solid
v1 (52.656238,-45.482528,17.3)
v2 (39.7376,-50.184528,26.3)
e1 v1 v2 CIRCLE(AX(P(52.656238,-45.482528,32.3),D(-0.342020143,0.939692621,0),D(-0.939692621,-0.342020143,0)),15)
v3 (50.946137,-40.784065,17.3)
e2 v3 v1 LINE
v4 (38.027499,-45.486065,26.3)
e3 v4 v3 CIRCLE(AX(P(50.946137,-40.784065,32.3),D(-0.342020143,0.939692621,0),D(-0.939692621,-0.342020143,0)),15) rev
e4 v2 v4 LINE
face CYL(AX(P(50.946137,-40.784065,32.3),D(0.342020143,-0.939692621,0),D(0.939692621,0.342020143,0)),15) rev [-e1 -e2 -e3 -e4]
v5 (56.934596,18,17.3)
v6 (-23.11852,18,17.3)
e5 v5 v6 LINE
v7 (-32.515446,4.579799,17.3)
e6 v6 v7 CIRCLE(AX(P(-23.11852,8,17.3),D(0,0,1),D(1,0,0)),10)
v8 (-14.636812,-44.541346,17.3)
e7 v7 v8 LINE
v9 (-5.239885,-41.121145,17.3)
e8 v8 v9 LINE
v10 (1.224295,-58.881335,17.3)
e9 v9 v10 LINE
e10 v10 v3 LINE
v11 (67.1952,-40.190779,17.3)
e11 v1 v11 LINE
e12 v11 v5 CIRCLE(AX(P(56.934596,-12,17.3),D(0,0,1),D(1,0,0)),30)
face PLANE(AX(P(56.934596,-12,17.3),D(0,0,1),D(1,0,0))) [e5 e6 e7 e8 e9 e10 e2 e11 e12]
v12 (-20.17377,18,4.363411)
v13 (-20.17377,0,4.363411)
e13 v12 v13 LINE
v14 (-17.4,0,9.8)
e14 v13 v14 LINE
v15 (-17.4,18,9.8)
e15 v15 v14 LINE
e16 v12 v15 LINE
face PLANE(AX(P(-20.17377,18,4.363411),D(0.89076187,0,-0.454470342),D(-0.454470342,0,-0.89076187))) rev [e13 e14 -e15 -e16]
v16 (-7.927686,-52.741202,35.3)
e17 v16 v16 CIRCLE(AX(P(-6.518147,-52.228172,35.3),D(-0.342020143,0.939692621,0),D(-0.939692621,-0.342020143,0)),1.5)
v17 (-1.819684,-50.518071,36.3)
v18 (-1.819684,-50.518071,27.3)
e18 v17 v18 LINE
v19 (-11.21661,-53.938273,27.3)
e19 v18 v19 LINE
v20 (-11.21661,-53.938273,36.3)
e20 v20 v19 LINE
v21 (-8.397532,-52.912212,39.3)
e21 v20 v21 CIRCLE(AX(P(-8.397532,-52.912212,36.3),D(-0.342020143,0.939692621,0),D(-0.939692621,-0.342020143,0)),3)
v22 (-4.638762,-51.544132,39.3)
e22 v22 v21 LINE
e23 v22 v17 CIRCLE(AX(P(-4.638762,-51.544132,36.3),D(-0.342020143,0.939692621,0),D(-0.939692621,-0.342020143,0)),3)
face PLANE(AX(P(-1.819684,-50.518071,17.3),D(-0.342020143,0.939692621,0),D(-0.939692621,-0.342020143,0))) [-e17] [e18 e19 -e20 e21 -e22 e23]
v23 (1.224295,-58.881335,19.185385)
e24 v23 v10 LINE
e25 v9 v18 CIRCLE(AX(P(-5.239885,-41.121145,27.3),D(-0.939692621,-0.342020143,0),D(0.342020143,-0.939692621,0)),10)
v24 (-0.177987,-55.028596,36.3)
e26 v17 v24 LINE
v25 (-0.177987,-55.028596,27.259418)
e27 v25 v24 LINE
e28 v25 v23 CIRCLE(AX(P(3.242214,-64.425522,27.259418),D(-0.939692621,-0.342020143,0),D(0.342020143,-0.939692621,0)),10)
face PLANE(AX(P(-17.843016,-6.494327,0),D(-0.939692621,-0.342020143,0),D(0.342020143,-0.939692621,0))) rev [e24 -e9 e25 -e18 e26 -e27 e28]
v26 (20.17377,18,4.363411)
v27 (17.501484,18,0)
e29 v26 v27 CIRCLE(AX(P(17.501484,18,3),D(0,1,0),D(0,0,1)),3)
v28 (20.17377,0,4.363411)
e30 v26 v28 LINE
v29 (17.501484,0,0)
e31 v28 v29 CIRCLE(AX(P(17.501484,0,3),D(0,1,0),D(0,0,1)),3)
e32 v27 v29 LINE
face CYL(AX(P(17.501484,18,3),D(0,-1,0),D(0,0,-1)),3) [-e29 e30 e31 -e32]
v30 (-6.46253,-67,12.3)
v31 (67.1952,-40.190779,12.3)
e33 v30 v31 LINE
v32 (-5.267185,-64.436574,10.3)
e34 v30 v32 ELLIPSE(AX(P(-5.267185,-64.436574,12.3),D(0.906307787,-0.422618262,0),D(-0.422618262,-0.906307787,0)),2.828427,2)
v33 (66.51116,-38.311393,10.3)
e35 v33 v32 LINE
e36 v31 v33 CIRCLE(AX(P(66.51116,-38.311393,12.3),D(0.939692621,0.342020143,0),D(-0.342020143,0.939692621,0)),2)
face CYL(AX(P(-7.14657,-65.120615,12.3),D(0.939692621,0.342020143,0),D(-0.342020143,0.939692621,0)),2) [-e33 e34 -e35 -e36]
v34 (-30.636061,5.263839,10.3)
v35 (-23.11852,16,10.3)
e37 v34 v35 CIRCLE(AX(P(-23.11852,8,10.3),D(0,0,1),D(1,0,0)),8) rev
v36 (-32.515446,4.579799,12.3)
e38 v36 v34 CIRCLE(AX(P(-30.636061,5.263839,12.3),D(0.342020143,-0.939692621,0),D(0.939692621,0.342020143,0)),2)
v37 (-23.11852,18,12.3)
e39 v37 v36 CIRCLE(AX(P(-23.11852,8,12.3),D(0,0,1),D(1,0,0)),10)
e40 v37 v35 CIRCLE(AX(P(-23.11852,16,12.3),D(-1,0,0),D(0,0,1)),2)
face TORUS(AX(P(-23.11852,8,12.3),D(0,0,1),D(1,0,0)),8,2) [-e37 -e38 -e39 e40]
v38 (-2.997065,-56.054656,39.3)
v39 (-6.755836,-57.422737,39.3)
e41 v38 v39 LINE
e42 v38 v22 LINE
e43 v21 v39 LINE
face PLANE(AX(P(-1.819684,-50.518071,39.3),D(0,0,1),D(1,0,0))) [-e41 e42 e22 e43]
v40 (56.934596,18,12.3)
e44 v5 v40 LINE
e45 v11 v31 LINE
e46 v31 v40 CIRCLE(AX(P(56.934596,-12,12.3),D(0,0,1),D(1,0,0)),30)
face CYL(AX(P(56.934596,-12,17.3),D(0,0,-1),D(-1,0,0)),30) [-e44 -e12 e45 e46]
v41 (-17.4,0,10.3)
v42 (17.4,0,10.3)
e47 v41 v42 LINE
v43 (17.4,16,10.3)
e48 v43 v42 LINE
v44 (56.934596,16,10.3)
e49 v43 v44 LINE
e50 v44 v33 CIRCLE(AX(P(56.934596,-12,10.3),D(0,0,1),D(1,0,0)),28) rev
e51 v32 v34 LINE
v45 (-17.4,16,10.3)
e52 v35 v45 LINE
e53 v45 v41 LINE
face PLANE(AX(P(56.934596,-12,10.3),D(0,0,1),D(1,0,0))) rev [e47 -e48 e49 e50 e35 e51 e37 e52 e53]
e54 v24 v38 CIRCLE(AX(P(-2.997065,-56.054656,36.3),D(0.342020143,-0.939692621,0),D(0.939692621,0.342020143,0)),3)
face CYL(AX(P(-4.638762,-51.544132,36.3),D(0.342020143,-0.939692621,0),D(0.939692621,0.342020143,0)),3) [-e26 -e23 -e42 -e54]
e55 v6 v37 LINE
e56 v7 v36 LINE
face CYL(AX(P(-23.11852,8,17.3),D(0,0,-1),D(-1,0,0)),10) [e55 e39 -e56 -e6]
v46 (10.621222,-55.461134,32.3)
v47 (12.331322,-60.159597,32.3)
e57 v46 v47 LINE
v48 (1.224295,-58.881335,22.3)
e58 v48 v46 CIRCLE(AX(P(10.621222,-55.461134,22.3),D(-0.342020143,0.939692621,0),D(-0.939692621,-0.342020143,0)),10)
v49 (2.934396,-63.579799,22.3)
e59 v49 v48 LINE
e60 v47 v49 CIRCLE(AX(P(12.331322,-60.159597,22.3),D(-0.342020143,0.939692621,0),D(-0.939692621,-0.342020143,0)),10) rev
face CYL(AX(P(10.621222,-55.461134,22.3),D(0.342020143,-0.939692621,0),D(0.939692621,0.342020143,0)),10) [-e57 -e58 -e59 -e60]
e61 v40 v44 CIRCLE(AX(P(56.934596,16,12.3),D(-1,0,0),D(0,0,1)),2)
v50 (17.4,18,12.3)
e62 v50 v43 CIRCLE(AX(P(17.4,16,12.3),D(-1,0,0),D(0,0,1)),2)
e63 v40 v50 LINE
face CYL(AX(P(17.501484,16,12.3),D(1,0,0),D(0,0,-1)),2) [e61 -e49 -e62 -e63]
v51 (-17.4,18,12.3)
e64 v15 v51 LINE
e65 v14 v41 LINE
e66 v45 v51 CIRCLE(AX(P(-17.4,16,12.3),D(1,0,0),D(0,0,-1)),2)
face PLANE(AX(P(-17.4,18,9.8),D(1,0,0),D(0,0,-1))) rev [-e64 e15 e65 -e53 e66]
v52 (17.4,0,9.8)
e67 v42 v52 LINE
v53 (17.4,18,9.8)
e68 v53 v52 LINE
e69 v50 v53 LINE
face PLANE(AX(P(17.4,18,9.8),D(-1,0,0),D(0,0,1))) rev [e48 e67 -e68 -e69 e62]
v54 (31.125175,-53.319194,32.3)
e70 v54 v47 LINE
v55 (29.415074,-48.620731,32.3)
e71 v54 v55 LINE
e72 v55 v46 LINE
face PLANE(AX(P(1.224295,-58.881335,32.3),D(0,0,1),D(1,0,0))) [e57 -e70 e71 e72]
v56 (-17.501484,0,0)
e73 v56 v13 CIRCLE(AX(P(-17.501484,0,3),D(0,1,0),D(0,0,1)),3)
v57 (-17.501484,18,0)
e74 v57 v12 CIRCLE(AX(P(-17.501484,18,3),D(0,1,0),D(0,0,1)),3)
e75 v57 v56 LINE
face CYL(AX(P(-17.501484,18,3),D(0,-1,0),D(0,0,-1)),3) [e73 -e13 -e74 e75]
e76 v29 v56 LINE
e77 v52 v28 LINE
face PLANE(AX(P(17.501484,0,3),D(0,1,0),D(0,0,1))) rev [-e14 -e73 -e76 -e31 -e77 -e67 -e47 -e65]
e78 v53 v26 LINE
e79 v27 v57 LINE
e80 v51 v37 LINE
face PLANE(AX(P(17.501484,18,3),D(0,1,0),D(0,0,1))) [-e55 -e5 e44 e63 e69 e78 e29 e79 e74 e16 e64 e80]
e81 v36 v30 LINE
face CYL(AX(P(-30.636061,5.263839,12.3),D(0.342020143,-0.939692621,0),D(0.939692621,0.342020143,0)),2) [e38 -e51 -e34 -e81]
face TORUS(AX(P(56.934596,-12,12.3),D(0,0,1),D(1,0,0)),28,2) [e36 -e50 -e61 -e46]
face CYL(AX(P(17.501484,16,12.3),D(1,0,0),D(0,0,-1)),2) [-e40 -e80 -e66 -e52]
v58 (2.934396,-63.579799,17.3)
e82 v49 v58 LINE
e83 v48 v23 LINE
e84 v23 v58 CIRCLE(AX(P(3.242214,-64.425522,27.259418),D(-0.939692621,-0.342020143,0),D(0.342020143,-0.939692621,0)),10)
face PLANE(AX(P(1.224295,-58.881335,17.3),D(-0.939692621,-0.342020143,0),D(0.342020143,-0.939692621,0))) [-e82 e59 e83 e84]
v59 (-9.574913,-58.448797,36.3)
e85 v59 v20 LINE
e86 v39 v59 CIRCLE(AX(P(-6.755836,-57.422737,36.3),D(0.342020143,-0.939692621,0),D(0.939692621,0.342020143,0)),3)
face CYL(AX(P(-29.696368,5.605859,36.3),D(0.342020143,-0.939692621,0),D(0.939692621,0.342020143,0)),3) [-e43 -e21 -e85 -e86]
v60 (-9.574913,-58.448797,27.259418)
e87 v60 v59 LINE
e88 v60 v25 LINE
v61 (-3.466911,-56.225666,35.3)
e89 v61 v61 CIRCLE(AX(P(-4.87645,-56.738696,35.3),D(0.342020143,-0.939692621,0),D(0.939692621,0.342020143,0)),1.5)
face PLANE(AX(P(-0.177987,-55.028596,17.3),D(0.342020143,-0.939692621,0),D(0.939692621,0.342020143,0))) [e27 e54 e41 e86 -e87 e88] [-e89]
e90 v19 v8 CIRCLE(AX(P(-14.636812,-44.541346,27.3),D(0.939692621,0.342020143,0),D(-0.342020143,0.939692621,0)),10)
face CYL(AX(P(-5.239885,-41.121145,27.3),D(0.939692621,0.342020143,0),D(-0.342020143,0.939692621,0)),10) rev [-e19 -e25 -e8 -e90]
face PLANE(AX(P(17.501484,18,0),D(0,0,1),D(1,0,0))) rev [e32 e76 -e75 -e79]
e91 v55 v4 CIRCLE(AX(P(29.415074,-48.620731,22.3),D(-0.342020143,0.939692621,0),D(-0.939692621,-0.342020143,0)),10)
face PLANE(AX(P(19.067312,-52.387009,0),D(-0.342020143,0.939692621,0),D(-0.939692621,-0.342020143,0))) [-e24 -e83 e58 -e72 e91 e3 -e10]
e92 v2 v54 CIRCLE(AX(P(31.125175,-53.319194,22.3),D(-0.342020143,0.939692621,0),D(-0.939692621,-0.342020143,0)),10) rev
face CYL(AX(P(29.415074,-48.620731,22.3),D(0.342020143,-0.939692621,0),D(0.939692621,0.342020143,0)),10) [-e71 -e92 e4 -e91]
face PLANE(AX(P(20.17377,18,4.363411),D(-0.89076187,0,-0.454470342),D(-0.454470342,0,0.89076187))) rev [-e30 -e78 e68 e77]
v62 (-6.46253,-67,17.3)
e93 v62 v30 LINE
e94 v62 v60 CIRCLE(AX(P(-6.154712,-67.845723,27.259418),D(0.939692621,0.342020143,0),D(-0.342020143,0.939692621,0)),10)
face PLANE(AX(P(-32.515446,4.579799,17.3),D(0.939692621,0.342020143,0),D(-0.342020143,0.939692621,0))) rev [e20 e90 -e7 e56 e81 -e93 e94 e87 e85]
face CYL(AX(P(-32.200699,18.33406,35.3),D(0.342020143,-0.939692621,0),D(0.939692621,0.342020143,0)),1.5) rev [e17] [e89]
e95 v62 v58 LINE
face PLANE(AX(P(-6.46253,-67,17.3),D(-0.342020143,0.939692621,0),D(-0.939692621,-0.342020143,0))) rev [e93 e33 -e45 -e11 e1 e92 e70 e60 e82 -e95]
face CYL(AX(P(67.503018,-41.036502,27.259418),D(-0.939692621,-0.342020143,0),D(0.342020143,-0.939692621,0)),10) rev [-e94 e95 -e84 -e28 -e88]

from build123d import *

# Parameters (mm, degrees)
SALIENTE_EXTRUIR1_DEPTH = 18
SALIENTE_EXTRUIR2_DEPTH = 7
CROQUIS4_W              = 22
CROQUIS4_H              = 4.8
SALIENTE_EXTRUIR3_DEPTH = 10
REDONDEO1_R             = 10
REDONDEO2_R             = 3
CROQUIS5_R              = 1.5
CORTAR_EXTRUIR1_DEPTH   = 104.776547512
CROQUIS6_W              = 40
CROQUIS6_H              = 15
SALIENTE_EXTRUIR4_DEPTH = 5
REDONDEO3_R             = 10
REDONDEO4_R             = 15
REDONDEO5_R             = 2


with BuildPart() as part:
    # Croquis1 → Saliente-Extruir1 (new body)
    with BuildSketch(Plane(origin=(0, 0, 0), x_dir=(1, 0, 0), z_dir=(0, 1, 0))):
        with BuildLine():
            Line((-20.173769885, -4.363411025), (-17.4, -9.8))
            Line((-17.4, -9.8), (-17.4, -10.3))
            Line((-17.4, -10.3), (17.4, -10.3))
            Line((17.4, -10.3), (17.4, -9.8))
            Line((17.4, -9.8), (20.173769885, -4.363411025))
            ThreePointArc((20.173769885, -4.363411025), (20.059826813, -1.433193227), (17.501484276, 0))
            Line((17.501484276, 0), (-17.501484276, 0))
            ThreePointArc((-17.501484276, 0), (-20.059826813, -1.433193227), (-20.173769885, -4.363411025))
        make_face()
    extrude(amount=SALIENTE_EXTRUIR1_DEPTH)

    # Croquis2 → Saliente-Extruir2 (add)
    with BuildSketch(Plane.XY.offset(10.3)):
        with BuildLine():
            Line((-17.4, 18), (-23.118519933, 18))
            ThreePointArc((-23.118519933, 18), (-31.310040375, 13.735764364), (-32.51544614, 4.579798567))
            Line((-32.51544614, 4.579798567), (-6.462530087, -67))
            Line((-6.462530087, -67), (67.195200278, -40.190778624))
            ThreePointArc((67.195200278, -40.190778624), (86.478828568, -6.79055467), (56.934595978, 18))
            Line((56.934595978, 18), (-17.4, 18))
        make_face()
    extrude(amount=SALIENTE_EXTRUIR2_DEPTH)

    # Croquis4 → Saliente-Extruir3 (add)
    with BuildSketch(Plane(origin=(-27.239942599, -9.914528289, 0), x_dir=(0, 0, 1), z_dir=(-0.939692620785908, -0.3420201433256697, 0))):
        with Locations((28.3, -49.249090126)):
            Rectangle(CROQUIS4_W, CROQUIS4_H)
    extrude(amount=-SALIENTE_EXTRUIR3_DEPTH)

    # Redondeo1
    # the kernel refuses this fillet: 10 mm, written as the material it adds along each edge
    with BuildSketch(Plane(origin=(-9.574913392, -58.448797151, 17.3), x_dir=(0.3420201433256697, -0.939692620785908, -1.1712242897144546e-15), z_dir=(0.9396926207859081, 0.34202014332566977, 0))) as redondeo1_piece_1:
        with BuildLine():
            CenterArc((10, -9.959417654), REDONDEO1_R, 95.163607091, 84.836392909)
            Line((0, -9.959417654), (-0.2, -9.959417654))
            Line((-0.2, -9.959417654), (-0.2, 0))
            Line((-0.2, 0), (0, 0.2))
            ThreePointArc((0, 0.2), (4.55, 0.2), (9.082, 0.199188353))
            Line((9.082, 0.199188353), (9.1, 0))
        make_face()
    extrude(amount=10)
    with BuildSketch(Plane(origin=(-11.21661008, -53.938272571, 17.3), x_dir=(-0.3420201433256697, 0.939692620785908, 0), z_dir=(0.9396926207859081, 0.34202014332566977, 0))) as redondeo1_piece_2:
        with BuildLine():
            CenterArc((REDONDEO1_R, REDONDEO1_R), REDONDEO1_R, 180, 90)
            Line((0, REDONDEO1_R), (-REDONDEO1_R * 0.02, REDONDEO1_R))
            Line((-REDONDEO1_R * 0.02, REDONDEO1_R), (-REDONDEO1_R * 0.02, -REDONDEO1_R * 0.02))
            Line((-REDONDEO1_R * 0.02, -REDONDEO1_R * 0.02), (REDONDEO1_R, -REDONDEO1_R * 0.02))
            Line((REDONDEO1_R, -REDONDEO1_R * 0.02), (REDONDEO1_R, 0))
        make_face()
    extrude(amount=10)

    # Redondeo2
    redondeo2_edges = [part.edges().sort_by_distance(p)[0] for p in [
        (-0.998835528, -52.773333428, 39.3),
        (-10.395761736, -56.193534861, 39.3),
    ]]
    fillet(redondeo2_edges, radius=REDONDEO2_R)

    # Croquis5 → Cortar-Extruir1 (cut, through all)
    with BuildSketch(Plane(origin=(17.665029208, -48.534268862, 0), x_dir=(0.9396926207859081, 0.34202014332566977, 0), z_dir=(0.3420201433256697, -0.939692620785908, 0))):
        with Locations((-23.988141438, 35.3)):
            Circle(CROQUIS5_R)
    extrude(amount=-CORTAR_EXTRUIR1_DEPTH, mode=Mode.SUBTRACT)

    # Croquis6 → Saliente-Extruir4 (add)
    with BuildSketch(Plane(origin=(20.777412512, -57.085471711, 0), x_dir=(0.9396926207859081, 0.3420201433256697, 0), z_dir=(0.34202014332566966, -0.939692620785908, 0))):
        with Locations((1.011858562, 24.8)):
            Rectangle(CROQUIS6_W, CROQUIS6_H)
    extrude(amount=-SALIENTE_EXTRUIR4_DEPTH)

    # Redondeo3
    redondeo3_edges = [part.edges().sort_by_distance(p)[0] for p in [
        (2.079345762, -61.230567015, 32.3),
        (39.667050594, -47.549761282, 32.3),
    ]]
    fillet(redondeo3_edges, radius=REDONDEO3_R)

    # Redondeo4
    # the kernel refuses this fillet: 15 mm, written as the material it adds along each edge
    with BuildSketch(Plane(origin=(40.522100952, -49.898992834, 17.3), x_dir=(-0.08679417196563514, -0.03159049510327337, 0.9957252695055648), z_dir=(-0.3420201433256697, 0.9396926207859082, 0))) as redondeo4_piece_1:
        with BuildLine():
            CenterArc((13.743188401, 14.243145828), REDONDEO4_R, 185.299645608, 66.421821522)
            Line((-1.192690642, 12.857679399), (-2.686278546, 12.719132757))
            Line((-2.686278546, 12.719132757), (-1.493587904, -0.138546643))
            Line((-1.493587904, -0.138546643), (0.138546643, -1.493587904))
            ThreePointArc((0.138546643, -1.493587904), (5.11717299, -1.031765761), (8.568182674, -1.424314583))
            Line((8.568182674, -1.424314583), (9.03863774, 0))
        make_face()
    extrude(amount=5)

    # Redondeo5
    redondeo5_edges = [part.edges().sort_by_distance(p)[0] for p in [
        (37.167297989, 18, 10.3),
        (-20.259259966, 18, 10.3),
        (-31.310040375, 13.735764364, 10.3),
        (-19.488988114, -31.210100717, 10.3),
        (30.366335095, -53.595389312, 10.3),
        (86.478828568, -6.79055467, 10.3),
    ]]
    fillet(redondeo5_edges, radius=REDONDEO5_R)


solid = part.part
